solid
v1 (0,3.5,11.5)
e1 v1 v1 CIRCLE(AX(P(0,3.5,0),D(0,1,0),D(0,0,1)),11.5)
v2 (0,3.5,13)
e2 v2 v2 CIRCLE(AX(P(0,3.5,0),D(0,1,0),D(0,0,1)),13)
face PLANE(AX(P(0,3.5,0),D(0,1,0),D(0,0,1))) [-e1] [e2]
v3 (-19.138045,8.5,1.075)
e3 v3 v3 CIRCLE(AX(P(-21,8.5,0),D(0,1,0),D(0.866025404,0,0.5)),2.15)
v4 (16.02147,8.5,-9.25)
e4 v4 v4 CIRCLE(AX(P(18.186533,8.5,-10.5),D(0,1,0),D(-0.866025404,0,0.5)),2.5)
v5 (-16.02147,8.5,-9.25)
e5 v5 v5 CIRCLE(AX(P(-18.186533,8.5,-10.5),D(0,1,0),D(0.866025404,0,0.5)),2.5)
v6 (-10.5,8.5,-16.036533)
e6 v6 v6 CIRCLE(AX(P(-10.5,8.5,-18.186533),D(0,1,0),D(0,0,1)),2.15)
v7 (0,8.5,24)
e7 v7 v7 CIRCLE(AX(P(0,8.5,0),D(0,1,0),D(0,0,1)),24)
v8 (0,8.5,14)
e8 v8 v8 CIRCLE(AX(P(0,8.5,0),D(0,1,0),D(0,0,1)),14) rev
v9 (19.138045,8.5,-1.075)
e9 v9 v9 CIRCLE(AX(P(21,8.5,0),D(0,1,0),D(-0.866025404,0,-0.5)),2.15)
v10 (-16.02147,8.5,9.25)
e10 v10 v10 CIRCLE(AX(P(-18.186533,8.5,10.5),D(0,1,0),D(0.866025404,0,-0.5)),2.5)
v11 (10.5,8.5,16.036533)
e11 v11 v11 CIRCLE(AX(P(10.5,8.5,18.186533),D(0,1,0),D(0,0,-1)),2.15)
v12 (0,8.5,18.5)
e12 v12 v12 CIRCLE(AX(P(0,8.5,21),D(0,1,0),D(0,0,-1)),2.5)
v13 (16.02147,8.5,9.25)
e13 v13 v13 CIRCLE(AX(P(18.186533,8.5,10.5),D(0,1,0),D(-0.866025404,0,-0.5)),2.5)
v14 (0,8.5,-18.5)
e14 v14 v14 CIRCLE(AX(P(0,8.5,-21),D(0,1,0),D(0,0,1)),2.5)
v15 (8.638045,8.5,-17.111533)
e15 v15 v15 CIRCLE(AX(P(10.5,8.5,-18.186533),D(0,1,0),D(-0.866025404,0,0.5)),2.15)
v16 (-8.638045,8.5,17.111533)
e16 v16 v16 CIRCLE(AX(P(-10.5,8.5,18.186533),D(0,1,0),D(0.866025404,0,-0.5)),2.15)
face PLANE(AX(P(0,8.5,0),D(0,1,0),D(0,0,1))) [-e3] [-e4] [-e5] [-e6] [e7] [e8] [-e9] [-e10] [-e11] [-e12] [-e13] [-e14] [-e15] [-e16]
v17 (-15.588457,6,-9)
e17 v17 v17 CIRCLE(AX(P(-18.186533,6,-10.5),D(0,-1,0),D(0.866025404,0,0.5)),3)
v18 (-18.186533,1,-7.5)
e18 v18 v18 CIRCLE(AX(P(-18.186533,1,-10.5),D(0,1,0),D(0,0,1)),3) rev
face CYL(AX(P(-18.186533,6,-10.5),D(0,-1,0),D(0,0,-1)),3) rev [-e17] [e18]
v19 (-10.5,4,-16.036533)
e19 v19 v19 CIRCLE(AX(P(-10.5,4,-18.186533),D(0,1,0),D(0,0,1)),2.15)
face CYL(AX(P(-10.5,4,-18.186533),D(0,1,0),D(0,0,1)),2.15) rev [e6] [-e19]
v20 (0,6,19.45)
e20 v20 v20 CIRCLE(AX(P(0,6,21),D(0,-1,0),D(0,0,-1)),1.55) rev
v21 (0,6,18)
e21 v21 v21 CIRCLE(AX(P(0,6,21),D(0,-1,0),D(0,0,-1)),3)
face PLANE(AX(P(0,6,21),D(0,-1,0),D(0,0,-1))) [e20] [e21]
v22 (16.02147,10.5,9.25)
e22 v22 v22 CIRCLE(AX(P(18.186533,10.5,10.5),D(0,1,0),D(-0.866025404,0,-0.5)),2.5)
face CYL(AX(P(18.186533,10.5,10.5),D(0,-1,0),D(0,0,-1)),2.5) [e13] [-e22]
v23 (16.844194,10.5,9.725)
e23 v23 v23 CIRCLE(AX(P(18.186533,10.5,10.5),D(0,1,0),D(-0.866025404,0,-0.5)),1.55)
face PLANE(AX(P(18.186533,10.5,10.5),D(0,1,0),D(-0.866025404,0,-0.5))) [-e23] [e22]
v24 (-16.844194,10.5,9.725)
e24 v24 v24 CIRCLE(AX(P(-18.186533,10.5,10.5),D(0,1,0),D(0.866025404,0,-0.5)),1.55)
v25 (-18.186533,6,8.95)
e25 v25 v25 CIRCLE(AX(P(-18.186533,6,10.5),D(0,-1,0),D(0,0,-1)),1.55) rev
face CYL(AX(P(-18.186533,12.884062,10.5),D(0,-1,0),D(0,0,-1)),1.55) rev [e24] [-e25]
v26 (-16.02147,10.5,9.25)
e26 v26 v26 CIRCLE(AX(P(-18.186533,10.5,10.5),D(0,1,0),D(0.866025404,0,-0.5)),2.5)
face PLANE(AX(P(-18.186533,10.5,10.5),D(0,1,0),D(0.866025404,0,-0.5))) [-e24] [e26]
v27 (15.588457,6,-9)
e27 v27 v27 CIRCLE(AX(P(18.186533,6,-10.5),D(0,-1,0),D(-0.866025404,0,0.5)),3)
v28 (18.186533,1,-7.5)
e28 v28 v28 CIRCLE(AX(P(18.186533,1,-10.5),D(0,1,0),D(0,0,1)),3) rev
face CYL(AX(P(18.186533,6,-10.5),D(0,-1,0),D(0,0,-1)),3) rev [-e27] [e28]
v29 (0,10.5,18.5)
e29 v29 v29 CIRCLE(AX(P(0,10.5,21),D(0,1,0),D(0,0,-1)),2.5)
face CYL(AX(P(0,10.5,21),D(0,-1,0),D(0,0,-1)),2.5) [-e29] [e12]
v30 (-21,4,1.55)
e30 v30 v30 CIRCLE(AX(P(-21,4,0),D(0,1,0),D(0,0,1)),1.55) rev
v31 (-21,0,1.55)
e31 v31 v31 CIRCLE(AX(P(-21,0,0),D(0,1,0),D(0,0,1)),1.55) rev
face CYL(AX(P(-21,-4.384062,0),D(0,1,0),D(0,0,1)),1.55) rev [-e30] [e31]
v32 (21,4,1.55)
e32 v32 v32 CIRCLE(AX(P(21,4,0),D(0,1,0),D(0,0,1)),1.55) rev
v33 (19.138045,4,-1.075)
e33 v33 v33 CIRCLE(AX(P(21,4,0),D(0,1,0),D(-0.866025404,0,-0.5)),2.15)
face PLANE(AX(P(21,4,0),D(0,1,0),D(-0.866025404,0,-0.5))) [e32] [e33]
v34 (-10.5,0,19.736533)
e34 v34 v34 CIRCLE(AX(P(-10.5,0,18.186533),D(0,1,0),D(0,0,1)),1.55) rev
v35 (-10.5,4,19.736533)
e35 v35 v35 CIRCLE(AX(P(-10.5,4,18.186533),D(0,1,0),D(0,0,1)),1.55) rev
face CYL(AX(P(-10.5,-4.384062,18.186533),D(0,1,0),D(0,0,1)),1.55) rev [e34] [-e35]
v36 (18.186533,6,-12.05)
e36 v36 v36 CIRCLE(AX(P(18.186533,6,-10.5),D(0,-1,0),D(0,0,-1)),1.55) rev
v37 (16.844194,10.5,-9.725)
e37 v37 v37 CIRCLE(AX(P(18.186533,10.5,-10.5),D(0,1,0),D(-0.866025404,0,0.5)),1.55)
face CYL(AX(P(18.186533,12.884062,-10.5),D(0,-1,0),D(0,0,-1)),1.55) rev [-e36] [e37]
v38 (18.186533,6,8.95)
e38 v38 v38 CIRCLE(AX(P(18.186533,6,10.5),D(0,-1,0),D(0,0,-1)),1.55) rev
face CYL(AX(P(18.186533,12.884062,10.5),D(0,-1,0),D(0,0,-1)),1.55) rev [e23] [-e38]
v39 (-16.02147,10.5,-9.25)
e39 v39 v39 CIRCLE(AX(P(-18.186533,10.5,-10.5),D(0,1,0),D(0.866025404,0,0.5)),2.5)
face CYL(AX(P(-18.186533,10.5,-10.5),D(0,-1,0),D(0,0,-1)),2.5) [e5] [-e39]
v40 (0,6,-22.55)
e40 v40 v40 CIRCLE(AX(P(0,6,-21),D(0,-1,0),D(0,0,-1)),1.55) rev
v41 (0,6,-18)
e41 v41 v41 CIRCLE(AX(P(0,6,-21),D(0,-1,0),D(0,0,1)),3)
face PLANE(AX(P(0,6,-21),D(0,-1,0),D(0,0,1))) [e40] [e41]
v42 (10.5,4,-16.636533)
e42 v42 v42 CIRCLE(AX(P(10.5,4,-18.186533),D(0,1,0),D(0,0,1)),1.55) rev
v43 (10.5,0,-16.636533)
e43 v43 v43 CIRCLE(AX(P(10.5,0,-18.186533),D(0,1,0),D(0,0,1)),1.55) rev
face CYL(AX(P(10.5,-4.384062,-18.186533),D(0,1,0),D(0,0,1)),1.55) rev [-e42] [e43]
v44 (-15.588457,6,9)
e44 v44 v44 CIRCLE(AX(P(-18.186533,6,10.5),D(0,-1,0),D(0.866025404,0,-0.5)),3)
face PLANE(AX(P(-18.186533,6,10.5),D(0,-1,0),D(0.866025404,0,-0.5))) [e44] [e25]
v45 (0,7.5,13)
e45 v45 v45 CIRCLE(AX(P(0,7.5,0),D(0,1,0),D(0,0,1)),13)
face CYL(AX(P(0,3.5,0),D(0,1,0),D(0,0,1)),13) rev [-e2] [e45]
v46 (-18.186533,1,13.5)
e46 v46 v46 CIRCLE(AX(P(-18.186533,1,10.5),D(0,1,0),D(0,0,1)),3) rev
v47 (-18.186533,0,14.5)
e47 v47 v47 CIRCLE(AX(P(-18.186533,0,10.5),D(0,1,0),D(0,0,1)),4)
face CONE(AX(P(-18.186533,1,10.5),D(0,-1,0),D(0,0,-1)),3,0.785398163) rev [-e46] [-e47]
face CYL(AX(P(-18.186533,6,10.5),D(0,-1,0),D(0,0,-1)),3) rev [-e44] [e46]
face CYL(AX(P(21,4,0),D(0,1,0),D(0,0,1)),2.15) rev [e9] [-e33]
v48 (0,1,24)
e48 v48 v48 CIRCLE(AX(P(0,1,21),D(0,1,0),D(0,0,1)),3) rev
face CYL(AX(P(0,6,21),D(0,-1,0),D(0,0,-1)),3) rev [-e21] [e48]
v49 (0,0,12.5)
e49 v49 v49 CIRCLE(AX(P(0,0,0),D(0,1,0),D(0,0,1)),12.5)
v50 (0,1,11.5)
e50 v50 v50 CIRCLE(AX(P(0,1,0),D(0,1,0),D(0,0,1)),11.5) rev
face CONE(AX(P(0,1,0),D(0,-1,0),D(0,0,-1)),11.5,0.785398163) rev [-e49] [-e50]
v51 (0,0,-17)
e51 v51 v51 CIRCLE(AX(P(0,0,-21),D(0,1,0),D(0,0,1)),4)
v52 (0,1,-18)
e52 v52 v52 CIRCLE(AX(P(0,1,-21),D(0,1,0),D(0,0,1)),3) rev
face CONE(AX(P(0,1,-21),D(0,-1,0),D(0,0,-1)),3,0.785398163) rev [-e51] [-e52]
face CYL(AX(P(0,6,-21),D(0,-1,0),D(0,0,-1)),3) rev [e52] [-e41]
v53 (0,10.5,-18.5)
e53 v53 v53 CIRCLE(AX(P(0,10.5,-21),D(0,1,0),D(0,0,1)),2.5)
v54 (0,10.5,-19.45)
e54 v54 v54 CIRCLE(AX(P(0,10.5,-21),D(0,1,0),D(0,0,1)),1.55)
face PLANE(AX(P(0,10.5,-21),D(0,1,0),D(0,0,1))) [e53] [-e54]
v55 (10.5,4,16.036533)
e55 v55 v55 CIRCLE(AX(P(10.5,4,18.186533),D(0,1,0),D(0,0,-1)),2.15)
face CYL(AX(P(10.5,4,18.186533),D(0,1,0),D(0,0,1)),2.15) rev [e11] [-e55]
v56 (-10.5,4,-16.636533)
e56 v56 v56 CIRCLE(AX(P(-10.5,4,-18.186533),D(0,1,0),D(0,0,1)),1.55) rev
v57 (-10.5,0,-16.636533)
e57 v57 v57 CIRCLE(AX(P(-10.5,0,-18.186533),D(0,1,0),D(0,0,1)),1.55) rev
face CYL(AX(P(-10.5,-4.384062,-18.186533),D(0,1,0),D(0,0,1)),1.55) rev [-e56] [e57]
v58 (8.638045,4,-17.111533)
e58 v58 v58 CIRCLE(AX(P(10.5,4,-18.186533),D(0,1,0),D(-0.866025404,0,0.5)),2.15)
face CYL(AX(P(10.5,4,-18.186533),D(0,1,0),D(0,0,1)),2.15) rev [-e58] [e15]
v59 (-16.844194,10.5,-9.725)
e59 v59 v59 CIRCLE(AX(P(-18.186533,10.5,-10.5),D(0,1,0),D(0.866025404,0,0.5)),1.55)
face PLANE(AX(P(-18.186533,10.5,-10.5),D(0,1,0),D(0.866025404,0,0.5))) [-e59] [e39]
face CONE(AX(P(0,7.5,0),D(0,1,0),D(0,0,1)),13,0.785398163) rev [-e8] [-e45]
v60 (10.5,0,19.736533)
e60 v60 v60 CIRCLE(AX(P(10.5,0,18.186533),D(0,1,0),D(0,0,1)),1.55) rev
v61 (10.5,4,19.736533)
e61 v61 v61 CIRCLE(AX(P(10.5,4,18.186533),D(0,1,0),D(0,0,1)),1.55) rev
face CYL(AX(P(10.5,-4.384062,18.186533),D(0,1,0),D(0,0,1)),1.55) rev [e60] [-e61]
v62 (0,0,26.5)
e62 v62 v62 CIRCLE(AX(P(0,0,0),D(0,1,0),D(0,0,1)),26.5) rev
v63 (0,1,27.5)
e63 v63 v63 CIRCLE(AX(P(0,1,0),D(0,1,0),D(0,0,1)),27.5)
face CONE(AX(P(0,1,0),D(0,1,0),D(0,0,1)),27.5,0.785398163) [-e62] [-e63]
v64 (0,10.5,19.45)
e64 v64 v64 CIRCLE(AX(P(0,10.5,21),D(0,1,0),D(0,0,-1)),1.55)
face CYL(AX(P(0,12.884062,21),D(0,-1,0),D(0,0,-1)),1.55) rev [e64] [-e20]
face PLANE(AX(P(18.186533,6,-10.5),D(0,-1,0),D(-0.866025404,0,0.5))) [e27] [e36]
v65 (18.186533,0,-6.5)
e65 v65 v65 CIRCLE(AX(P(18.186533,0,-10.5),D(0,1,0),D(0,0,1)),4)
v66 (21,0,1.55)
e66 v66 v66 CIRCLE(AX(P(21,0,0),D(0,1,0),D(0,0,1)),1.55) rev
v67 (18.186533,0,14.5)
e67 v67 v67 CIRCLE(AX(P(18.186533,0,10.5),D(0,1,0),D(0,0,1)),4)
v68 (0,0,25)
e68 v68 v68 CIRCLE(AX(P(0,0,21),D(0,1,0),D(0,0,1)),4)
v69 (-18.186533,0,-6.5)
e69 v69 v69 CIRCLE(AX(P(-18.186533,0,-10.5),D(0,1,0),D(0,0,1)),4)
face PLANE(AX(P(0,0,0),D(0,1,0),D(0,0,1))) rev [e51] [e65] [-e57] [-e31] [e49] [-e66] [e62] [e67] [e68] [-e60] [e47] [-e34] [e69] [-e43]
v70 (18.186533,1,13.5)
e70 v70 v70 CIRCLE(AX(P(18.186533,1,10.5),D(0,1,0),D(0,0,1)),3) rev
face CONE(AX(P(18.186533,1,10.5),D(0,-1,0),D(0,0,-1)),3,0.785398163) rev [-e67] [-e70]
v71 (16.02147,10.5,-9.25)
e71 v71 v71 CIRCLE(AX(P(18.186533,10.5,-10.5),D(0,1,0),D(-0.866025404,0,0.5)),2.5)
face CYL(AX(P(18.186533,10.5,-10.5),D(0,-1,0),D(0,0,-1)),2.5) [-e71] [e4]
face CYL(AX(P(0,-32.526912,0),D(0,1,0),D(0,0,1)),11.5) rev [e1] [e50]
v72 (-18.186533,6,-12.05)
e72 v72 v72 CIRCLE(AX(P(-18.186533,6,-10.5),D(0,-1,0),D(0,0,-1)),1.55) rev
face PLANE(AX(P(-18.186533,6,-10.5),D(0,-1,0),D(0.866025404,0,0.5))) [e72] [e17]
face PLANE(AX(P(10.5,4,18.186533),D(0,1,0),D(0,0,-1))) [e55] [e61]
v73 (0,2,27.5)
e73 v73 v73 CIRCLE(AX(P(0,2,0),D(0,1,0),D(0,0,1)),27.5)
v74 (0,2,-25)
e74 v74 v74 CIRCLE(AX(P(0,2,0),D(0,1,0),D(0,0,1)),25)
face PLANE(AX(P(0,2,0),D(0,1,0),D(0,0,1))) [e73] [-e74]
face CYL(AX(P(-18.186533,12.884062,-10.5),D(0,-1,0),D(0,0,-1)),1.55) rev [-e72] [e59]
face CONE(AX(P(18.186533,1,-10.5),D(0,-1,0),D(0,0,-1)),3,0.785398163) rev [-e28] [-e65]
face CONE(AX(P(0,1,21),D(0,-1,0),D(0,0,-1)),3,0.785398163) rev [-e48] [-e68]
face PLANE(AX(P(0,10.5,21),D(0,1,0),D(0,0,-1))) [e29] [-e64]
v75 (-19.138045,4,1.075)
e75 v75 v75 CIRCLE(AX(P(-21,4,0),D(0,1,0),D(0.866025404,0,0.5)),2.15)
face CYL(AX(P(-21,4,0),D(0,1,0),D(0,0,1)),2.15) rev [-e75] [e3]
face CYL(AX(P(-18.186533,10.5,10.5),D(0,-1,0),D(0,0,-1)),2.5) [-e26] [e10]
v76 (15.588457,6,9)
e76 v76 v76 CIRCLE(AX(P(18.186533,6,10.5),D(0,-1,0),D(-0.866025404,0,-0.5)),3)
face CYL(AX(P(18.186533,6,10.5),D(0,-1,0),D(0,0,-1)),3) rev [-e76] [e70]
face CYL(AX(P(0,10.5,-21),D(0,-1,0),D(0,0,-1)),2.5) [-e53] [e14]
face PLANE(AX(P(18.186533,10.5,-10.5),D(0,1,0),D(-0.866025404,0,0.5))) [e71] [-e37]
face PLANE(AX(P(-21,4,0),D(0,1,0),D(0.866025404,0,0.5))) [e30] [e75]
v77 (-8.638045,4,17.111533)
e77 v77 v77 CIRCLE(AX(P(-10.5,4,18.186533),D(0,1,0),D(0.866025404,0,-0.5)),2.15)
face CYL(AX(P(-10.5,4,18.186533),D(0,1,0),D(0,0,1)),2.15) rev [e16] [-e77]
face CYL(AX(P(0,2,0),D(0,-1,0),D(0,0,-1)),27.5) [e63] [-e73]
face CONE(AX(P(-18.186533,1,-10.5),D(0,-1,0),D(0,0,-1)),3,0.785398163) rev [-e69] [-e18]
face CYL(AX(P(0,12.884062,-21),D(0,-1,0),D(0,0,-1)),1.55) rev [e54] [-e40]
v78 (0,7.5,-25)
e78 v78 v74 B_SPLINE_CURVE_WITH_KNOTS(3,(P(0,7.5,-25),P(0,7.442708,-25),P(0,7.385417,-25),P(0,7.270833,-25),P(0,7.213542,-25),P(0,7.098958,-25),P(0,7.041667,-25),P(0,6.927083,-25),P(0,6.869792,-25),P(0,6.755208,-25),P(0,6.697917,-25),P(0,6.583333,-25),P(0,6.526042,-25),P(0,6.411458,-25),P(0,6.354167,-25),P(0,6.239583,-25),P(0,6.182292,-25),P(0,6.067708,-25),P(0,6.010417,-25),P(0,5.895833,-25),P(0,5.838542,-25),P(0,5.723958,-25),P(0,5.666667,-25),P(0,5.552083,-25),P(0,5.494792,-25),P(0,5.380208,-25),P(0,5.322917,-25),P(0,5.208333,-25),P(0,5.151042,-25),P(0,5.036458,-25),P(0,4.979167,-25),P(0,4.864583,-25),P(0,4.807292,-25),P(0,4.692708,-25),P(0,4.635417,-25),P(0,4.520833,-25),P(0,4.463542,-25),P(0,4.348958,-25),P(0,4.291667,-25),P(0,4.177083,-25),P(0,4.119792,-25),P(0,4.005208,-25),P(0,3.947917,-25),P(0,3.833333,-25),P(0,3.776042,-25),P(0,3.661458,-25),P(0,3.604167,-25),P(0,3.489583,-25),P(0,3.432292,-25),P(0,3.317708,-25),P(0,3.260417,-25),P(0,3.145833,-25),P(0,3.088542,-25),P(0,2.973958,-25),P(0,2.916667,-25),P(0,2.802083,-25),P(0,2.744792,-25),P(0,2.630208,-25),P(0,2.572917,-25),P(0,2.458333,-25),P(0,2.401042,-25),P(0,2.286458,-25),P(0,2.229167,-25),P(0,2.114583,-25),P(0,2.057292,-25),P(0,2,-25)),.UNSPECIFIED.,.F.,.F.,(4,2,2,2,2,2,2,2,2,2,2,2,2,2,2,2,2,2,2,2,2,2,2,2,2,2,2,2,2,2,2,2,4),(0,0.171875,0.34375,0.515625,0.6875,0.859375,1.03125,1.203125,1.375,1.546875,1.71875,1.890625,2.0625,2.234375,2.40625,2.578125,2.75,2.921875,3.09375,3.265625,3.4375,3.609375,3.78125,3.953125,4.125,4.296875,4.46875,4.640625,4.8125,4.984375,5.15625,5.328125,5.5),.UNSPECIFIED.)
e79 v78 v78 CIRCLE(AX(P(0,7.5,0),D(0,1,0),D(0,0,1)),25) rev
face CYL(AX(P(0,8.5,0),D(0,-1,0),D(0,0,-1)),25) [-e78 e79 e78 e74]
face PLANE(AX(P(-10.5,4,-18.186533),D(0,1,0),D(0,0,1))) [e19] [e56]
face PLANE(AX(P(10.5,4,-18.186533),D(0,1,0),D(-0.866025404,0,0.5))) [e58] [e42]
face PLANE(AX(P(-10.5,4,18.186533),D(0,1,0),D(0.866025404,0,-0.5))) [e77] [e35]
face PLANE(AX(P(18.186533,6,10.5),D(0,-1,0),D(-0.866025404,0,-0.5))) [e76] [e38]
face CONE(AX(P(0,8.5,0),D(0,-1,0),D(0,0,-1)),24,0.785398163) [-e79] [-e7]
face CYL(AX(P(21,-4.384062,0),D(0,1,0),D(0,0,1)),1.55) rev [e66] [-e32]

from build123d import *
from build123d.topology import SkipClean

# Parameters (mm, degrees)
SKETCH1_R                    = 27.5
BOSS_EXTRUDE1_DEPTH          = 2
SKETCH2_R                    = 25
BOSS_EXTRUDE2_DEPTH          = 6.5
SKETCH3_R                    = 13
CUT_EXTRUDE1_DEPTH           = 5
SKETCH4_R                    = 11.5
CUT_EXTRUDE2_DEPTH           = 8.5
CHAMFER1_SIZE                = 1
SKETCH5_R                    = 1.55
CUT_EXTRUDE3_DEPTH           = 8.5
SKETCH6_R                    = 3
CUT_EXTRUDE4_DEPTH           = 6
CHAMFER2_SIZE                = 1
CIRPATTERN1_COUNT            = 6
CHAMFER2_OF_CIRPATTERN1_SIZE = 1
SKETCH7_R                    = 1.55
CUT_EXTRUDE5_DEPTH           = 8.5
SKETCH8_R                    = 2.15
CUT_EXTRUDE6_DEPTH           = 4.5
CIRPATTERN2_COUNT            = 6
SKETCH9_R                    = 2.5
SKETCH9_R_2                  = 1.55
BOSS_EXTRUDE3_DEPTH          = 2
CIRPATTERN3_COUNT            = 6


with BuildPart() as part:
    # Sketch1 → Boss-Extrude1 (new body)
    with BuildSketch(Plane(origin=(0, 0, 0), x_dir=(1, 0, 0), z_dir=(0, 1, 0))):
        with Locations(Location((0, 0, 0), (0, 0, 270))):
            Circle(SKETCH1_R)
    extrude(amount=BOSS_EXTRUDE1_DEPTH)

    # Sketch2 → Boss-Extrude2 (add)
    with BuildSketch(Plane(origin=(0, 2, 0), x_dir=(1, 0, 0), z_dir=(0, 1, 0))):
        with Locations(Location((0, 0, 0), (0, 0, 90))):
            Circle(SKETCH2_R)
    extrude(amount=BOSS_EXTRUDE2_DEPTH)

    # Sketch3 → Cut-Extrude1 (cut)
    with BuildSketch(Plane(origin=(0, 8.5, 0), x_dir=(1, 0, 0), z_dir=(0, 1, 0))):
        with Locations(Location((0, 0, 0), (0, 0, 270))):
            Circle(SKETCH3_R)
    extrude(amount=-CUT_EXTRUDE1_DEPTH, mode=Mode.SUBTRACT)

    # Sketch4 → Cut-Extrude2 (cut)
    with BuildSketch(Plane(origin=(0, 8.5, 0), x_dir=(1, 0, 0), z_dir=(0, 1, 0))):
        with Locations(Location((0, 0, 0), (0, 0, 270))):
            Circle(SKETCH4_R)
    extrude(amount=-CUT_EXTRUDE2_DEPTH, mode=Mode.SUBTRACT)

    # Chamfer1
    chamfer1_edges = [part.edges().sort_by_distance(p)[0] for p in [
        (0, 8.5, -13),
        (0, 0, -11.5),
        (0, 0, -27.5),
        (0, 8.5, 25),
    ]]
    chamfer(chamfer1_edges, length=CHAMFER1_SIZE)

    # Sketch5 → Cut-Extrude3 (cut)
    with BuildSketch(Plane.XZ):
        with Locations(Location((0, 21, 0), (0, 0, 270))):
            Circle(SKETCH5_R)
    cut_extrude3 = extrude(amount=-CUT_EXTRUDE3_DEPTH, mode=Mode.SUBTRACT)

    # Sketch6 → Cut-Extrude4 (cut)
    with BuildSketch(Plane.XZ):
        with Locations(Location((0, 21, 0), (0, 0, 270))):
            Circle(SKETCH6_R)
    cut_extrude4 = extrude(amount=-CUT_EXTRUDE4_DEPTH, mode=Mode.SUBTRACT)

    # Chamfer2
    chamfer2_edges = [part.edges().sort_by_distance(p)[0] for p in [
        (0, 0, 24),
    ]]
    chamfer(chamfer2_edges, length=CHAMFER2_SIZE)

    # CirPattern1: Cut-Extrude3, Cut-Extrude4 ×6 about axis
    cirpattern1_axis = Axis((0, 0, 0), (0, 1, 0))
    add([cut_extrude3.rotate(cirpattern1_axis, i * 360 / CIRPATTERN1_COUNT) for i in range(1, CIRPATTERN1_COUNT)], mode=Mode.SUBTRACT)
    add([cut_extrude4.rotate(cirpattern1_axis, i * 360 / CIRPATTERN1_COUNT) for i in range(1, CIRPATTERN1_COUNT)], mode=Mode.SUBTRACT)

    # Chamfer2 of CirPattern1
    chamfer2_of_cirpattern1_edges = [part.edges().sort_by_distance(p)[0] for p in [
        (20.784609691, 0, 12),
        (20.784609691, 0, -12),
        (0, 0, -24),
        (-20.784609691, 0, -12),
        (-20.784609691, 0, 12),
    ]]
    chamfer(chamfer2_of_cirpattern1_edges, length=CHAMFER2_OF_CIRPATTERN1_SIZE)

    # Sketch7 → Cut-Extrude5 (cut)
    with BuildSketch(Plane(origin=(0, 8.5, 0), x_dir=(1, 0, 0), z_dir=(0, 1, 0))):
        with Locations(Location((-10.5, 18.186533479, 0), (0, 0, 270))):
            Circle(SKETCH7_R)
    cut_extrude5 = extrude(amount=-CUT_EXTRUDE5_DEPTH, mode=Mode.SUBTRACT)

    # Sketch8 → Cut-Extrude6 (cut)
    with BuildSketch(Plane(origin=(0, 8.5, 0), x_dir=(1, 0, 0), z_dir=(0, 1, 0))):
        with Locations(Location((-10.5, 18.186533479, 0), (0, 0, 270))):
            Circle(SKETCH8_R)
    cut_extrude6 = extrude(amount=-CUT_EXTRUDE6_DEPTH, mode=Mode.SUBTRACT)

    # CirPattern2: Cut-Extrude5, Cut-Extrude6 ×6 about axis
    cirpattern2_axis = Axis((0, 0, 0), (0, 1, 0))
    add([cut_extrude5.rotate(cirpattern2_axis, i * 360 / CIRPATTERN2_COUNT) for i in range(1, CIRPATTERN2_COUNT)], mode=Mode.SUBTRACT)
    add([cut_extrude6.rotate(cirpattern2_axis, i * 360 / CIRPATTERN2_COUNT) for i in range(1, CIRPATTERN2_COUNT)], mode=Mode.SUBTRACT)

    # Sketch9 → Boss-Extrude3 (add)
    with SkipClean():  # the faces are left unmerged after this step: merging them gives an invalid solid
        with BuildSketch(Plane(origin=(0, 8.5, 0), x_dir=(1, 0, 0), z_dir=(0, 1, 0))):
            with Locations(Location((0, 21, 0), (0, 0, 270))):
                Circle(SKETCH9_R)
            with Locations(Location((0, 21, 0), (0, 0, 90))):
                Circle(SKETCH9_R_2, mode=Mode.SUBTRACT)
        boss_extrude3 = extrude(amount=BOSS_EXTRUDE3_DEPTH)
    add(part.part.scale(1), mode=Mode.REPLACE)  # the faces are merged on a copy

    # CirPattern3: Boss-Extrude3 ×6 about axis
    cirpattern3_axis = Axis((0, 0, 0), (0, 1, 0))
    for i in range(1, CIRPATTERN3_COUNT):
        add(boss_extrude3.rotate(cirpattern3_axis, i * 360 / CIRPATTERN3_COUNT))


solid = part.part
